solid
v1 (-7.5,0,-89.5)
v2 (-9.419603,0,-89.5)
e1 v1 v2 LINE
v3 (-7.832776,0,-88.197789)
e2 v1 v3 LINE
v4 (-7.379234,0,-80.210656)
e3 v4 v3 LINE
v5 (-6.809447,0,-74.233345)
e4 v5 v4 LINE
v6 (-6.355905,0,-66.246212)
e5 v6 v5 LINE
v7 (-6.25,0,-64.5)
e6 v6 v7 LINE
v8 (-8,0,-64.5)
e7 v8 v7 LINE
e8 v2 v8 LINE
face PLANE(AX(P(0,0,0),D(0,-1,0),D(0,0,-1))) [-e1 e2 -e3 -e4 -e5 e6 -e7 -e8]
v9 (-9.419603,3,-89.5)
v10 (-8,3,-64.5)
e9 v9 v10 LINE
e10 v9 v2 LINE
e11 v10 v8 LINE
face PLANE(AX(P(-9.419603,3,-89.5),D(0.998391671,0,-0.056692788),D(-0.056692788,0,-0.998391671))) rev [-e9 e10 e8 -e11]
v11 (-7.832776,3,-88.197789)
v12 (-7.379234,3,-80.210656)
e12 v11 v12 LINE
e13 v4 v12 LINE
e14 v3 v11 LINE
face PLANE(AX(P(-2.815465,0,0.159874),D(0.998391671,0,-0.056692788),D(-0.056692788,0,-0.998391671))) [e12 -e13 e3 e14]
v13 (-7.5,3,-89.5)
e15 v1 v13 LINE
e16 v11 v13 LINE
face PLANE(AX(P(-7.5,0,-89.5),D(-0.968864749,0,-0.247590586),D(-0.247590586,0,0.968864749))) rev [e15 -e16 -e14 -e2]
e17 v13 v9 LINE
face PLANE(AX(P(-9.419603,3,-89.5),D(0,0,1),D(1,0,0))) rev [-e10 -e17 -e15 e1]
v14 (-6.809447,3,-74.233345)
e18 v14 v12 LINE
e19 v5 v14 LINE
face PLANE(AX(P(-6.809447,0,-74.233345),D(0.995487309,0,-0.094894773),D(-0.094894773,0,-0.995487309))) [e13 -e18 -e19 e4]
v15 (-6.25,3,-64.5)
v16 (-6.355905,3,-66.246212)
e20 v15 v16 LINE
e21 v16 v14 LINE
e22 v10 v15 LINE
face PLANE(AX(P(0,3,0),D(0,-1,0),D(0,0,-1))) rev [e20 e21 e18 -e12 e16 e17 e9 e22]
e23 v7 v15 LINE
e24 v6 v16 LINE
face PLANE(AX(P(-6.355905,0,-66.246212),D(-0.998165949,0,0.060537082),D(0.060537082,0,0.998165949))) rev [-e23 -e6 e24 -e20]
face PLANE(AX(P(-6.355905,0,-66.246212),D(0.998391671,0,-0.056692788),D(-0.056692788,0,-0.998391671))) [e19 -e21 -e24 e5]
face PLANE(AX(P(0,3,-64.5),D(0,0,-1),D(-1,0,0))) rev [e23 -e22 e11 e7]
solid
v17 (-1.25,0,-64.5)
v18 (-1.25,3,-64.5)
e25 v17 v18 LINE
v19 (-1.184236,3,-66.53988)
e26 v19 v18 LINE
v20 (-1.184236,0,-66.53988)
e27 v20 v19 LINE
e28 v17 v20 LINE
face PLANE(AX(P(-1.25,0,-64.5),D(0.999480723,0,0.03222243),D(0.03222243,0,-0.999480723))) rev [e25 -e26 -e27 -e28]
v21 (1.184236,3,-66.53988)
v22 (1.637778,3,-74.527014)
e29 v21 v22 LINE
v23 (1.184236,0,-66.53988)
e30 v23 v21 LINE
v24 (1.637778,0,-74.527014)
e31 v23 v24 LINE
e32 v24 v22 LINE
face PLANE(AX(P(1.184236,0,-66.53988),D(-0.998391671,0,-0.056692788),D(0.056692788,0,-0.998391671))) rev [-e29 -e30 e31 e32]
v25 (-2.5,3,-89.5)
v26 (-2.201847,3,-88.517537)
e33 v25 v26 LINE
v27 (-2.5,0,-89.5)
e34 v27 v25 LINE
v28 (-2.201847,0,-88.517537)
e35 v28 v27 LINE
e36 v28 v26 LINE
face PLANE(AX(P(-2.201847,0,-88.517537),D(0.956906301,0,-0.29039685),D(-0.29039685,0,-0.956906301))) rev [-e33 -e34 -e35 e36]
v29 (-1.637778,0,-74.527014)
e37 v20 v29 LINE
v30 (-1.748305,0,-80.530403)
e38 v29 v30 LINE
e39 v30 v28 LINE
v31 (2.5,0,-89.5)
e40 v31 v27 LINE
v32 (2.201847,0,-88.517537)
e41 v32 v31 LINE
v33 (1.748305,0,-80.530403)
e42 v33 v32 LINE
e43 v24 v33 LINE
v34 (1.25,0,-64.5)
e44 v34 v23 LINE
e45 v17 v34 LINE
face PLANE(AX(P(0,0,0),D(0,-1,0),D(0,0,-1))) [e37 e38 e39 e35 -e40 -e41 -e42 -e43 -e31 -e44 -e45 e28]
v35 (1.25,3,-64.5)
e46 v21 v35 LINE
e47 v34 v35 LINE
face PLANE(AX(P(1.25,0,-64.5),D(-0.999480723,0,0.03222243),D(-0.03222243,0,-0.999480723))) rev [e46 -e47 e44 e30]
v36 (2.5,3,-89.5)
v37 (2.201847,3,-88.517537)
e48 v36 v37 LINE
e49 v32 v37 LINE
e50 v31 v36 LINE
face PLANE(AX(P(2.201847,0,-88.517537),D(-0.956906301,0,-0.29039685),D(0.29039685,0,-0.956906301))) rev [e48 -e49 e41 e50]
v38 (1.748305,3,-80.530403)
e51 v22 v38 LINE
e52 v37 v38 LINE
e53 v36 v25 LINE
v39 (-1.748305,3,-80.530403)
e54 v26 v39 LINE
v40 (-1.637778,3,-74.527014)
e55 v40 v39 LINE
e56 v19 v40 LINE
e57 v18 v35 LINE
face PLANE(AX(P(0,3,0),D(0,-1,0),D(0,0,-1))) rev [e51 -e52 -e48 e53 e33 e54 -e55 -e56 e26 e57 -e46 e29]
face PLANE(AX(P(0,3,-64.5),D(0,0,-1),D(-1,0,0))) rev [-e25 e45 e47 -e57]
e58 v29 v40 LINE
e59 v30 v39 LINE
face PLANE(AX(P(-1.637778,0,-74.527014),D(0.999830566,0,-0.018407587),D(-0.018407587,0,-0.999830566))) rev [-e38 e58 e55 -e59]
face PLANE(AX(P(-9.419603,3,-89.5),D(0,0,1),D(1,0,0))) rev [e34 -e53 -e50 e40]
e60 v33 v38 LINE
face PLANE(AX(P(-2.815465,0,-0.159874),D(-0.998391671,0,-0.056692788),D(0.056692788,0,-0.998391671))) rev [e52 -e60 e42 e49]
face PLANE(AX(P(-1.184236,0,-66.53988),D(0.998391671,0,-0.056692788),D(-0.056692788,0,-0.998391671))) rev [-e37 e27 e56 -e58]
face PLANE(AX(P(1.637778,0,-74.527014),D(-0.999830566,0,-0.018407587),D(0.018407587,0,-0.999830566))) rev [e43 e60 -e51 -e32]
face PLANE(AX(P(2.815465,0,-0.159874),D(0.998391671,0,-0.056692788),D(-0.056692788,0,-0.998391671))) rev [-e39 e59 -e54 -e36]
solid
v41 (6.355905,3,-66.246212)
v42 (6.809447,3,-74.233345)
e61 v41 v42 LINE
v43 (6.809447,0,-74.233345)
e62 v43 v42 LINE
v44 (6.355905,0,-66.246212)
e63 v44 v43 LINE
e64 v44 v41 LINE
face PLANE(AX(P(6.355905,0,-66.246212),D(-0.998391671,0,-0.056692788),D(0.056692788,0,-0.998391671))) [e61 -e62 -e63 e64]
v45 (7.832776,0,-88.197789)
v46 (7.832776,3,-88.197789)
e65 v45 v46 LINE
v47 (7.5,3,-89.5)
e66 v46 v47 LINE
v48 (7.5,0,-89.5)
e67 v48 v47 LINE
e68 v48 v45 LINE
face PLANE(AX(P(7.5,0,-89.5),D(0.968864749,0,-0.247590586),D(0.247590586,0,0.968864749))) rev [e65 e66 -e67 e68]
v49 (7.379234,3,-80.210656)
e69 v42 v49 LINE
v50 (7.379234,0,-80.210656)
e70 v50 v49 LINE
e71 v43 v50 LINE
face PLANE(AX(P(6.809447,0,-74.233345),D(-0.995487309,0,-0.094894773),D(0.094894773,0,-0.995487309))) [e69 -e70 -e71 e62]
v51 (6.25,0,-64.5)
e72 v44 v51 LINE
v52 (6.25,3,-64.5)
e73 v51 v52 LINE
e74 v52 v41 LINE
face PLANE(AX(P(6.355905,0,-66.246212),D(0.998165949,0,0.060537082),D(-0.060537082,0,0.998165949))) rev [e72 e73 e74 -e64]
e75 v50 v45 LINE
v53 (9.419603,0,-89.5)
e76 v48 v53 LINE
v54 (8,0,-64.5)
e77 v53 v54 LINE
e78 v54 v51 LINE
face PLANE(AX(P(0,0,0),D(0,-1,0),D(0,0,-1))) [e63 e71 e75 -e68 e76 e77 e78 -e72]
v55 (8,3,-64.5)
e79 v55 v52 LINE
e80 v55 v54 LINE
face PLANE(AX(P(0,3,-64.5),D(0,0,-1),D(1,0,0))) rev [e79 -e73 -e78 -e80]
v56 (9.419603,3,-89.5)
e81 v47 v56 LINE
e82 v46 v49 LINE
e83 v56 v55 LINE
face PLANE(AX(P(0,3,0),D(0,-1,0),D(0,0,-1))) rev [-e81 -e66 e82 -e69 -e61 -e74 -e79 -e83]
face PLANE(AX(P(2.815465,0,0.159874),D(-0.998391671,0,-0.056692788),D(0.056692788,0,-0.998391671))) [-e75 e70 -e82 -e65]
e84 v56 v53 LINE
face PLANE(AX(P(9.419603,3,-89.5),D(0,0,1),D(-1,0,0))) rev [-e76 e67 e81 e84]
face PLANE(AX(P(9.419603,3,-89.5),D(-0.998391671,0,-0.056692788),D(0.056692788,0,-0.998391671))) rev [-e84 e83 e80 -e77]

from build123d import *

# Parameters (mm, degrees)
BOSS_EXTRUDE1_DEPTH = 3
CUT_EXTRUDE1_DEPTH  = 91.044316414
BOSS_EXTRUDE2_DEPTH = 3
CUT_EXTRUDE7_DEPTH  = 91.044316414
CUT_EXTRUDE9_DEPTH  = 91.044316414
MIRROR10_DEPTH      = 3


# Read off the part's stored shape, not the designer's step: Mirror10
with BuildPart() as part:
    # Sketch1 → Boss-Extrude1 (new body)
    with BuildSketch(Plane(origin=(0, 0, 0), x_dir=(1, 0, 0), z_dir=(0, 1, 0))):
        Polygon((-9.419602878, 89.5), (-8, 64.5), (0, 64.5), (0, 89.5), align=None)
    extrude(amount=BOSS_EXTRUDE1_DEPTH)

    # Sketch2 → Cut-Extrude1 (cut, symmetric)
    with BuildSketch(Plane(origin=(0, 3, 0), x_dir=(1, 0, 0), z_dir=(0, 1, 0))):
        Polygon((-6.585534884, 66.233172431), (-0.954605862, 66.552919753), (-2.201847188, 88.517536505), (-7.83277621, 88.197789183), align=None)
    extrude(amount=CUT_EXTRUDE1_DEPTH, both=True, mode=Mode.SUBTRACT)

    # Sketch6 → Boss-Extrude2 (add)
    with BuildSketch(Plane(origin=(0, 3, 0), x_dir=(1, 0, 0), z_dir=(0, 1, 0))):
        Polygon((-6.585534884, 66.233172431), (-6.3559048, 66.246211772), (-6.8094471, 74.233345137), (-7.37923391, 80.210655819), align=None)
    boss_extrude2 = extrude(amount=-BOSS_EXTRUDE2_DEPTH)

    # Mirror3: Boss-Extrude2 across plane
    add(boss_extrude2.mirror(Plane(origin=(0, 0, 0), x_dir=(0.05669278756337804, 0, 0.9983916705573488), z_dir=(0.9983916705573489, 0, -0.05669278756337803))))

    # Sketch7 → Cut-Extrude7 (cut, symmetric)
    with BuildSketch(Plane(origin=(0, 3, 0), x_dir=(1, 0, 0), z_dir=(0, 1, 0))):
        Polygon((-7.5, 89.5), (-7.83277621, 88.197789183), (-2.201847188, 88.517536505), (-2.5, 89.5), align=None)
    extrude(amount=CUT_EXTRUDE7_DEPTH, both=True, mode=Mode.SUBTRACT)

    # Sketch14 → Cut-Extrude9 (cut, symmetric)
    with BuildSketch(Plane(origin=(0, 3, 0), x_dir=(1, 0, 0), z_dir=(0, 1, 0))):
        Polygon((-6.3559048, 66.246211772), (-6.25, 64.5), (-1.25, 64.5), (-1.184235946, 66.539880412), align=None)
    extrude(amount=CUT_EXTRUDE9_DEPTH, both=True, mode=Mode.SUBTRACT)


with BuildPart() as cut_extrude9_piece_1:
    # of the separate pieces the step leaves, piece 1, a body of its own (cut_extrude9_pieces)
    add(part.part.solids().sort_by_distance((-1.25, 0, -64.5))[0])

    # Mirror10 outline → Mirror10 (add)
    with BuildSketch(Plane(origin=(0, 0, 0), x_dir=(1, 0, 0), z_dir=(0, 1, 0))):
        Polygon((0, 64.5), (1.25, 64.5), (1.184235946, 66.539880412), (1.637778247, 74.527013776), (1.748304888, 80.530403141), (2.201847188, 88.517536505), (2.5, 89.5), (0, 89.5), align=None)
    extrude(amount=MIRROR10_DEPTH)


with BuildPart() as cut_extrude9_piece_2:
    # of the separate pieces the step leaves, piece 2, a body of its own (cut_extrude9_pieces)
    add(part.part.solids().sort_by_distance((-9.419602878, 0, -89.5))[0])


with BuildPart() as body_3:
    # Mirror12: mirrored copy
    add(cut_extrude9_piece_2.part.mirror(Plane(origin=(0, 0, 0), x_dir=(0, 0, 1), z_dir=(1, 0, 0))))


solid = Compound([cut_extrude9_piece_1.part, cut_extrude9_piece_2.part, body_3.part])
